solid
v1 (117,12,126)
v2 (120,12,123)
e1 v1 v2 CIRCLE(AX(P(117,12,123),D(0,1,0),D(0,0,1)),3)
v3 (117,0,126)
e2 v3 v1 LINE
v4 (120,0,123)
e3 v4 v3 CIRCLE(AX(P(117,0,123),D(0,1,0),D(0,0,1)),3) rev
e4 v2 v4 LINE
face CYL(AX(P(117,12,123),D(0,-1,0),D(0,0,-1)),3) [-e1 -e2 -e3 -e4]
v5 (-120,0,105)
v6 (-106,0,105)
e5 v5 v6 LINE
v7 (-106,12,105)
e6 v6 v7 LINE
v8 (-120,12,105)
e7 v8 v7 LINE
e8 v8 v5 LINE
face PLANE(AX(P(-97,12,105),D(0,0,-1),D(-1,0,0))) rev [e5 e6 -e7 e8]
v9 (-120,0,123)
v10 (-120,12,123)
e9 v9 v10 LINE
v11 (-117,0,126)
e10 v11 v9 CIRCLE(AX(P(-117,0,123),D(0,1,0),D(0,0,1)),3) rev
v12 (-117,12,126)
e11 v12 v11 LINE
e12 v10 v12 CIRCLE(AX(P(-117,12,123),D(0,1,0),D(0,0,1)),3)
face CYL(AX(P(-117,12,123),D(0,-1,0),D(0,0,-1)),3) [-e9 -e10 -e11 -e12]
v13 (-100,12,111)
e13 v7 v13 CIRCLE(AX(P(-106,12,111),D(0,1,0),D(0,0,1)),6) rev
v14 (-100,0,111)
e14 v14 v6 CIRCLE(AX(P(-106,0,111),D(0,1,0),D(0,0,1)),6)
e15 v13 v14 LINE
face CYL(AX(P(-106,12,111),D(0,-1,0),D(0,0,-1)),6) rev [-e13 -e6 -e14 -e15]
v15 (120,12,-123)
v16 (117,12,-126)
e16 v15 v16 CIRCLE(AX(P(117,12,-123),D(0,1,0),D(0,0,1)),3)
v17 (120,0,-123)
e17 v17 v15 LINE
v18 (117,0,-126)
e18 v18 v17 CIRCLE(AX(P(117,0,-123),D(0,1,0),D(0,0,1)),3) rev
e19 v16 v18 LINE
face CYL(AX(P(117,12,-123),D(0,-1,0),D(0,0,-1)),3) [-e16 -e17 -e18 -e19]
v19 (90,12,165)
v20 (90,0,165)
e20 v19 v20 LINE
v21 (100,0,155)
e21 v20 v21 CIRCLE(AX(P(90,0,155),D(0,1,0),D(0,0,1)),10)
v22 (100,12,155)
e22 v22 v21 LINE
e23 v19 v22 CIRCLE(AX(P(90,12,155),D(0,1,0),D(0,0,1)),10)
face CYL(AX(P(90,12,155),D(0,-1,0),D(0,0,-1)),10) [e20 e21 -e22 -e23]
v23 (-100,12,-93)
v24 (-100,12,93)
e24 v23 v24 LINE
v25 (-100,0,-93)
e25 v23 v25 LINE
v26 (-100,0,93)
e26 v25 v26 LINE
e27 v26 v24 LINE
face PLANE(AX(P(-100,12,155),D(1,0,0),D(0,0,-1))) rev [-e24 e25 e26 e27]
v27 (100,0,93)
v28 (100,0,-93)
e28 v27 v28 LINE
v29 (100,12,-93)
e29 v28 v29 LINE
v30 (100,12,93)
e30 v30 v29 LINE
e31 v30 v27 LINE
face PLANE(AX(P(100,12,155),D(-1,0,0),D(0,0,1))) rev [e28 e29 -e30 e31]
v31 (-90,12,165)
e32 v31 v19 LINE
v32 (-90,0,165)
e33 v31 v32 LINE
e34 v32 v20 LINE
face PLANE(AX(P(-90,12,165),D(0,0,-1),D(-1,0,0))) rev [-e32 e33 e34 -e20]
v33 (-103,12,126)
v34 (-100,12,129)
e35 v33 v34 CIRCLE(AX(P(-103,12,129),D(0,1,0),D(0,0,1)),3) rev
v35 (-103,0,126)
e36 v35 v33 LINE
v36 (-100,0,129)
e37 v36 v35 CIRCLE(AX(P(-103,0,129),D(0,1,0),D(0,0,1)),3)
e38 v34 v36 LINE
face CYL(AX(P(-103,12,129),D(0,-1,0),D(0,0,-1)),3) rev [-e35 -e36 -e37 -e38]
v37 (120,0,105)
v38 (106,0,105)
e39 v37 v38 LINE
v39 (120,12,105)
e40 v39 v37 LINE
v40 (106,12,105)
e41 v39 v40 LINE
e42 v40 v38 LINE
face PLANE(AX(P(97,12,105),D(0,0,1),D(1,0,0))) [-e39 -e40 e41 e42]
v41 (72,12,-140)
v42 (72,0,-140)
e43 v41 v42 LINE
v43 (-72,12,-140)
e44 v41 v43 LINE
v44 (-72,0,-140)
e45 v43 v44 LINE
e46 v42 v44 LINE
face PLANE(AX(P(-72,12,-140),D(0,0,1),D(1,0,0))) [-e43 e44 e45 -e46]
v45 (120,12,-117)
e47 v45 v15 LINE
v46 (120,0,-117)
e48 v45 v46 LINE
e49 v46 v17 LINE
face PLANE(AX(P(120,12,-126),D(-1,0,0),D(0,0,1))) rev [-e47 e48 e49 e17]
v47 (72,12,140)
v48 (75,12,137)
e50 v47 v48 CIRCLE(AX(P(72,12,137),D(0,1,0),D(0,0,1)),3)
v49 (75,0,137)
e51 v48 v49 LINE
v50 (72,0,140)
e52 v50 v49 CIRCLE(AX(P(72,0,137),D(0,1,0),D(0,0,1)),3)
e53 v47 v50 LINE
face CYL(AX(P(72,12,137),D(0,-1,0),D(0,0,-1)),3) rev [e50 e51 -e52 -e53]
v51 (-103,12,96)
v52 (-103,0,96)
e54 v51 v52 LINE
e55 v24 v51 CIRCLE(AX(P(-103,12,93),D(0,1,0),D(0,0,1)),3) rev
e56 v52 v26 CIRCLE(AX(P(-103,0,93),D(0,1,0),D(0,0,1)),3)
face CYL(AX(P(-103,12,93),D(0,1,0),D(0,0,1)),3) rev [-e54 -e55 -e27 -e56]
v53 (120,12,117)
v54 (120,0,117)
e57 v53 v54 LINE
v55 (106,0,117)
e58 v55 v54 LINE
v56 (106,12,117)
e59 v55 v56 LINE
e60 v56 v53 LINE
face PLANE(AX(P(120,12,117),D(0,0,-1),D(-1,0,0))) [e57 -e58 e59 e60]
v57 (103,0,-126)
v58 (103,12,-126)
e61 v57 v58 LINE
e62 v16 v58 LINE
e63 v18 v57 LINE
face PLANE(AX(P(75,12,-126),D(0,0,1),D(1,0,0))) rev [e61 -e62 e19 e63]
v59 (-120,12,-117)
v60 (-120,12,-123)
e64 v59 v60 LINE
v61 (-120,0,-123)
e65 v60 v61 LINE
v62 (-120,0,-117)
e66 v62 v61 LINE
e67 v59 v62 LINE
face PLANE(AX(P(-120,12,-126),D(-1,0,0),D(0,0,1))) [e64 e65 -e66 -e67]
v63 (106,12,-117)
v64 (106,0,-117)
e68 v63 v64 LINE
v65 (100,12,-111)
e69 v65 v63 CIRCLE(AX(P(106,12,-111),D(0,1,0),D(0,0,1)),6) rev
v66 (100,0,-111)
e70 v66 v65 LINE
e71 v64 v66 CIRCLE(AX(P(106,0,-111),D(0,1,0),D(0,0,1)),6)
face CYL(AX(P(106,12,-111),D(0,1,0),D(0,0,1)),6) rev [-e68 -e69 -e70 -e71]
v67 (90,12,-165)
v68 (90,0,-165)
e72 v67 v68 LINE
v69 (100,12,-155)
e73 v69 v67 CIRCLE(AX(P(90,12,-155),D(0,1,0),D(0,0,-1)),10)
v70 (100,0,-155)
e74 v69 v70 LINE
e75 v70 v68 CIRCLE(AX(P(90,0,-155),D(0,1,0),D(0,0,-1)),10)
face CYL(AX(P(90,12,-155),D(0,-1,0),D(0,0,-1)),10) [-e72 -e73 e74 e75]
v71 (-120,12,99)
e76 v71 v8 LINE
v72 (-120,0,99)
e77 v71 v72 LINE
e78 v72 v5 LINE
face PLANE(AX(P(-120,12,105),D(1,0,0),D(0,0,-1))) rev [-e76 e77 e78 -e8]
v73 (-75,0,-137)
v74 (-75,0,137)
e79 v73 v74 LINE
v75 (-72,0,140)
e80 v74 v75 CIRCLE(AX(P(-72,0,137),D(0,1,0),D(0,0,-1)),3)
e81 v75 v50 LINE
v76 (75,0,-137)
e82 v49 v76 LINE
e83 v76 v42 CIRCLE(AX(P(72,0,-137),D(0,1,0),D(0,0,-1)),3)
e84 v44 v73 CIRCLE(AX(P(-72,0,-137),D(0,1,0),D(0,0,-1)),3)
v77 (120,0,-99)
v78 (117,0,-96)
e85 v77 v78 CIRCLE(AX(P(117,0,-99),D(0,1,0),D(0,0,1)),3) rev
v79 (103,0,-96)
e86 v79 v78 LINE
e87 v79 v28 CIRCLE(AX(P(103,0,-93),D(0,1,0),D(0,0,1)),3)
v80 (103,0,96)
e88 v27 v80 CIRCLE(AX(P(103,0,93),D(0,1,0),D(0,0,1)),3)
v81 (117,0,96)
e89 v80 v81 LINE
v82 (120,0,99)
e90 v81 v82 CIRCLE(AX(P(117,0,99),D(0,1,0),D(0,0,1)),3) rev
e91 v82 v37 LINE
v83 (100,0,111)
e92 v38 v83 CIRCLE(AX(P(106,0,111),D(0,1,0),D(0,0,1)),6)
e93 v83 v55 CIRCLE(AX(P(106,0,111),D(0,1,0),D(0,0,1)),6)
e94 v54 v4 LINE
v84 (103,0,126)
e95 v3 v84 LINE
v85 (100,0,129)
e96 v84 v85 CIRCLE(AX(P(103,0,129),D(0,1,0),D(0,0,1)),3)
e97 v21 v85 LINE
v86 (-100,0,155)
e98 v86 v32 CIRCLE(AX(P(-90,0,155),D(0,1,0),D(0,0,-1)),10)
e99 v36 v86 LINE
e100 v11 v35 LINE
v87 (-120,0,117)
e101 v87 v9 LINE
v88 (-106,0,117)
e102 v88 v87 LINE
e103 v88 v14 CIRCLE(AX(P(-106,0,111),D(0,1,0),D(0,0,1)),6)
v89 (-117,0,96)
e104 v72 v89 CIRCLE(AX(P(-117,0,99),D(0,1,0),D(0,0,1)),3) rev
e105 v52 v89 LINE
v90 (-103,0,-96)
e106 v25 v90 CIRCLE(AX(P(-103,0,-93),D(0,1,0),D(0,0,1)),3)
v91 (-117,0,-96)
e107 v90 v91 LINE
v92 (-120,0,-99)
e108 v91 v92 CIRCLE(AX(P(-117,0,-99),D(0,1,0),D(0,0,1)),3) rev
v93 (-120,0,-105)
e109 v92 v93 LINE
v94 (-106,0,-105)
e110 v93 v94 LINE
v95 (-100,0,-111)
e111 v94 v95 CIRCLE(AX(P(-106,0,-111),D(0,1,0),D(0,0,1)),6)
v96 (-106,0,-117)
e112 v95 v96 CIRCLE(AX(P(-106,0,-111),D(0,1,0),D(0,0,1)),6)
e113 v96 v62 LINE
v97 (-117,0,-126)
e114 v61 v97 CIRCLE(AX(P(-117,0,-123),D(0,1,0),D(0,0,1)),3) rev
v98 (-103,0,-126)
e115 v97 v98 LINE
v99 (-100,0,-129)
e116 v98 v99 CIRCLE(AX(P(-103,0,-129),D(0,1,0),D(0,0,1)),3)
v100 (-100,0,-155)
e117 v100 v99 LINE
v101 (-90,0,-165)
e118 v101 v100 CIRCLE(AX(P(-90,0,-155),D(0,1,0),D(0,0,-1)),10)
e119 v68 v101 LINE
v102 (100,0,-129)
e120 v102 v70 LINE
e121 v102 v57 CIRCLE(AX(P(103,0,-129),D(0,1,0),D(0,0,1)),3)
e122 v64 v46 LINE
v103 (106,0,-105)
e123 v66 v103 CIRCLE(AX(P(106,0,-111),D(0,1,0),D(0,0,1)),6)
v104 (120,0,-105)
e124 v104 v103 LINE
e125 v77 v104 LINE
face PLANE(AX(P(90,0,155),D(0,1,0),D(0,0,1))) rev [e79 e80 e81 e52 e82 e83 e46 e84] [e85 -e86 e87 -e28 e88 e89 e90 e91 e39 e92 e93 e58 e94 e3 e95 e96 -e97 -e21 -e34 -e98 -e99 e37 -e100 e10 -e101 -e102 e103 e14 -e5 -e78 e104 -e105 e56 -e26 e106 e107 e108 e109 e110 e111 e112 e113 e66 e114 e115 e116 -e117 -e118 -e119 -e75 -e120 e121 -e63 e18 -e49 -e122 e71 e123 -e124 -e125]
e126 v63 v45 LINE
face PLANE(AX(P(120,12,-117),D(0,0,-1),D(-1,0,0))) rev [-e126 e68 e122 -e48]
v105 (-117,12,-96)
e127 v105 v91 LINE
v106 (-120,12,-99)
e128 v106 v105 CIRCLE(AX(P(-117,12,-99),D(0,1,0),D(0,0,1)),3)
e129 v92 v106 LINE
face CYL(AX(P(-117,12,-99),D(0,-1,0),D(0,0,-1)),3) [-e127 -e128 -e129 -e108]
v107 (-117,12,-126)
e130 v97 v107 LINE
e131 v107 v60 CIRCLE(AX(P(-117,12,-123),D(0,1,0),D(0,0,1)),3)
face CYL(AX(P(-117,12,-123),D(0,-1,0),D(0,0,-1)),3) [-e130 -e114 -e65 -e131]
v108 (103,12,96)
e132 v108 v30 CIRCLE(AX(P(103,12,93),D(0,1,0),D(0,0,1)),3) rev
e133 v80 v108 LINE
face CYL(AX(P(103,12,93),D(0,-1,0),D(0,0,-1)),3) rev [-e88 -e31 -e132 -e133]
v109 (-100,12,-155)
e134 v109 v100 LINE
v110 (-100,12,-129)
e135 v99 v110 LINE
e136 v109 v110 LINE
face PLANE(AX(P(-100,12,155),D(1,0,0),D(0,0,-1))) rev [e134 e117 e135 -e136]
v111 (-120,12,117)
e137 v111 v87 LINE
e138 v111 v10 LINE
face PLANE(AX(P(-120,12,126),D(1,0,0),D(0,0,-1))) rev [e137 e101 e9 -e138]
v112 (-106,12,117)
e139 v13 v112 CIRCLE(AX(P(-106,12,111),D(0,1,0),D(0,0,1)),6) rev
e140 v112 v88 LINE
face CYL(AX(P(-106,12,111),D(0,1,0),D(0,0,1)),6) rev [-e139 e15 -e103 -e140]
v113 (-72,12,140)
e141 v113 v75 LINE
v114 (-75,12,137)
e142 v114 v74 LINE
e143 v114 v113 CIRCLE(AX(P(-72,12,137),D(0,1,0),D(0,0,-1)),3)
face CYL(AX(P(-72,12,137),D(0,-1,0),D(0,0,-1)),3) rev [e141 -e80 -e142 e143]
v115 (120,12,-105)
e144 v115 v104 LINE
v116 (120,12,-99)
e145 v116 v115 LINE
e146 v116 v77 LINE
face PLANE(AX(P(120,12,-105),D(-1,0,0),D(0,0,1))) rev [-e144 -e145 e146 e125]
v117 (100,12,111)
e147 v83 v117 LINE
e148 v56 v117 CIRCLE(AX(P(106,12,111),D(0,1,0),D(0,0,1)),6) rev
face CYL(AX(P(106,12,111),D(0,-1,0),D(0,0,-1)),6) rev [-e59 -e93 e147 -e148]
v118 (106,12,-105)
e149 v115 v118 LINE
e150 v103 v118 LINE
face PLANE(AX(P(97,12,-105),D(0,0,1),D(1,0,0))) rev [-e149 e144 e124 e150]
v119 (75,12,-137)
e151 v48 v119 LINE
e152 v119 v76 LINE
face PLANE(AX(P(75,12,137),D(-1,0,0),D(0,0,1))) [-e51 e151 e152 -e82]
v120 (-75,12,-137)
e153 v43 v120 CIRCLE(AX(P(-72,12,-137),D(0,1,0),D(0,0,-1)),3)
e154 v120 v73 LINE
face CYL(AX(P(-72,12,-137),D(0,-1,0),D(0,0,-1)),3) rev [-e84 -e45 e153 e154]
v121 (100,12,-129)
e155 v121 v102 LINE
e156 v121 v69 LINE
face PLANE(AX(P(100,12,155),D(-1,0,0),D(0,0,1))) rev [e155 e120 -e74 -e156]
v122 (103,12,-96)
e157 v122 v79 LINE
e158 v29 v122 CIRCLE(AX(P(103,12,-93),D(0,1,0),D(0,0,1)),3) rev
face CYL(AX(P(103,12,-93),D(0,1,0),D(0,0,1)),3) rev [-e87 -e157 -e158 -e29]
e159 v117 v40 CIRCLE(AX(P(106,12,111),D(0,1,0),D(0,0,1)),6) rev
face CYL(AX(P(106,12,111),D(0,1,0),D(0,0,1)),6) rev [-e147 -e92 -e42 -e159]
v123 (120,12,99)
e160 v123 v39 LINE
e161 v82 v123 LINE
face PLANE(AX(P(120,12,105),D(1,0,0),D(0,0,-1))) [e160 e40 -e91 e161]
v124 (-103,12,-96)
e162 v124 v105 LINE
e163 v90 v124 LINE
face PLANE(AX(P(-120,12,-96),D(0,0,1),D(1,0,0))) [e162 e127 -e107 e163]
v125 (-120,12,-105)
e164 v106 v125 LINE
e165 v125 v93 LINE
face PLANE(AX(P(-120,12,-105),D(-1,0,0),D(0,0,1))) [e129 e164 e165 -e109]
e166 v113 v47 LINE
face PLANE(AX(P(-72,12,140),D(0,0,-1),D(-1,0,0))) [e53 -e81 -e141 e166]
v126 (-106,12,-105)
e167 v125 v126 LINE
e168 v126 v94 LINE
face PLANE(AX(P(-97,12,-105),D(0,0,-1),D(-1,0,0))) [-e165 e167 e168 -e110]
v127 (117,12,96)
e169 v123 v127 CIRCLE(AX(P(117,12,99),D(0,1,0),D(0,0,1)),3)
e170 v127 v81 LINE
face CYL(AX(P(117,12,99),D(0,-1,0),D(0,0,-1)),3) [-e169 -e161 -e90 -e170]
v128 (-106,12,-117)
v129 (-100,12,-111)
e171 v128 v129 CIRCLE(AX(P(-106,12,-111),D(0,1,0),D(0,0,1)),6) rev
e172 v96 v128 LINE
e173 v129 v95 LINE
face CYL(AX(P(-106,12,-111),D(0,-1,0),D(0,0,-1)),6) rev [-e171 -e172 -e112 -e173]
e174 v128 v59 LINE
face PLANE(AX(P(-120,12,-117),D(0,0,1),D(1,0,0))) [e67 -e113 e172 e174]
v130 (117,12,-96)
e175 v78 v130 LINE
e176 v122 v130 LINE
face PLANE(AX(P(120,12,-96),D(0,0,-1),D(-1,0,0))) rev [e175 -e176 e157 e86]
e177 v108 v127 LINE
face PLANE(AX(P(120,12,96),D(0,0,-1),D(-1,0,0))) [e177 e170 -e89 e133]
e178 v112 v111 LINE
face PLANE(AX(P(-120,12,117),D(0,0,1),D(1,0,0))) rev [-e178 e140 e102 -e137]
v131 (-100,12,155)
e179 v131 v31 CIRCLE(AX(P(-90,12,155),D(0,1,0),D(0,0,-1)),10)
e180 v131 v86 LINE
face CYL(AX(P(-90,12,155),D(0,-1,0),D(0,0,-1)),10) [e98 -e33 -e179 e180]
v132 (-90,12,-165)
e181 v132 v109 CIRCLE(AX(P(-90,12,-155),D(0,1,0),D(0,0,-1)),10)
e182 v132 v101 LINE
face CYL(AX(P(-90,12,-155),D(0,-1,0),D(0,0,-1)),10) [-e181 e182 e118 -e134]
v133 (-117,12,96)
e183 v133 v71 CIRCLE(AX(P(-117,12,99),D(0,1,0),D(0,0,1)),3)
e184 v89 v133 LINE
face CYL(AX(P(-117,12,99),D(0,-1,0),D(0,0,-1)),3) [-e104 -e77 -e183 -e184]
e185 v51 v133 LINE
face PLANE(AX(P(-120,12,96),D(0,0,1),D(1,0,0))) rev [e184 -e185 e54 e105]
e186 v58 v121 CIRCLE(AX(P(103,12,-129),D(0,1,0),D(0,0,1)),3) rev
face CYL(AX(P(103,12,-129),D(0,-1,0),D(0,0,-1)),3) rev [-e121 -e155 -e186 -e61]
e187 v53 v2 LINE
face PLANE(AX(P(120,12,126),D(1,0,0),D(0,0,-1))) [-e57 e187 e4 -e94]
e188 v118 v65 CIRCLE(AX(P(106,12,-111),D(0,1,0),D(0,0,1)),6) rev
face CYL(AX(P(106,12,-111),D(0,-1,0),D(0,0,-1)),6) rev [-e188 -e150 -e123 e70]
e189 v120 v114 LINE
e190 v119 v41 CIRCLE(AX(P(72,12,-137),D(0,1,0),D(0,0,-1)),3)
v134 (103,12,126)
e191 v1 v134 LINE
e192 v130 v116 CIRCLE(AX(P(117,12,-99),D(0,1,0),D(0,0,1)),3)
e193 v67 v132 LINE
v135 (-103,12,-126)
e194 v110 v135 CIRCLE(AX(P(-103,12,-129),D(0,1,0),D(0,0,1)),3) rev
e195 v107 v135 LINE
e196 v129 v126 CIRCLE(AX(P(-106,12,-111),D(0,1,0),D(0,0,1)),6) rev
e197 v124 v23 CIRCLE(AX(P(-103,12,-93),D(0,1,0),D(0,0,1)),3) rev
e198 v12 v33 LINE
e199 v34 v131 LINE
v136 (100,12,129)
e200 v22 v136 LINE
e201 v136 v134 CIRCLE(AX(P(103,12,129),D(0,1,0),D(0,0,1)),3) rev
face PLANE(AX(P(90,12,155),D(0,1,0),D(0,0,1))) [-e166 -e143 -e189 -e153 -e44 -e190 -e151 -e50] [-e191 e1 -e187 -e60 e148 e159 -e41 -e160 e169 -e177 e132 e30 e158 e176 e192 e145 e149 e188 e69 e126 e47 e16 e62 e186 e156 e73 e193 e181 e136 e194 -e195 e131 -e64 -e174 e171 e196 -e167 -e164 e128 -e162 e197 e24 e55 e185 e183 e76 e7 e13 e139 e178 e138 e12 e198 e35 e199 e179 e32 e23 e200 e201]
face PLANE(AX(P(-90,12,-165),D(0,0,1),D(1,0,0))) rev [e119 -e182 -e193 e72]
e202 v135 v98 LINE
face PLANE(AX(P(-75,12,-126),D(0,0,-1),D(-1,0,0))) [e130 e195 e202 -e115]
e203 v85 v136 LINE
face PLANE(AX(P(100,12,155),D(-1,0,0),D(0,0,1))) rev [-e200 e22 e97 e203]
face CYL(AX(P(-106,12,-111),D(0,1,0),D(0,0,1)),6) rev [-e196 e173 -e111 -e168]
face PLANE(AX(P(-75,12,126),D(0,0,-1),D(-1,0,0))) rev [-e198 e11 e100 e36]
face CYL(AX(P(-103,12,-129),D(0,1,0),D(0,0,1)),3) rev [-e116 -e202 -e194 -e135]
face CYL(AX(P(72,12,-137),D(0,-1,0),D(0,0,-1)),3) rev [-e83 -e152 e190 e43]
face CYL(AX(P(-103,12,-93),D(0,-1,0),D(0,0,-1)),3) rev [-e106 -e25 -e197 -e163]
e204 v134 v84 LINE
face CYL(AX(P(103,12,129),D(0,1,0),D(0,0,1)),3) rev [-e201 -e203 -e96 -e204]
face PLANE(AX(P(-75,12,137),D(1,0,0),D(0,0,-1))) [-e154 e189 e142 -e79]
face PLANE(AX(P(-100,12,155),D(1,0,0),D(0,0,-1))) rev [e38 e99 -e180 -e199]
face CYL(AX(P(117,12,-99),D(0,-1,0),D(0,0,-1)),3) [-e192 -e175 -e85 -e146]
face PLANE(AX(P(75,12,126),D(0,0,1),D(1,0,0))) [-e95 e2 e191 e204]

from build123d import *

# Parameters (mm, degrees)
BOSS_EXTRUDE1_DEPTH  = 12
BOSS_EXTRUDE2_DEPTH  = 12
MIRROR4_COPY_1_DEPTH = 12
FILLET3_R            = 6
FILLET4_R            = 3


with BuildPart() as part:
    # Sketch2 → Boss-Extrude1 (new body)
    with BuildSketch(Plane(origin=(0, 0, 0), x_dir=(1, 0, 0), z_dir=(0, 1, 0))):
        with BuildLine():
            Line((-90, -165), (90, -165))
            ThreePointArc((90, -165), (97.071067812, -162.071067812), (100, -155))
            Line((100, -155), (100, 155))
            ThreePointArc((100, 155), (97.071067812, 162.071067812), (90, 165))
            Line((90, 165), (-90, 165))
            ThreePointArc((-90, 165), (-97.071067812, 162.071067812), (-100, 155))
            Line((-100, 155), (-100, -155))
            ThreePointArc((-100, -155), (-97.071067812, -162.071067812), (-90, -165))
        make_face()
        with BuildLine():
            Line((-72, -140), (72, -140))
            ThreePointArc((72, -140), (74.121320344, -139.121320344), (75, -137))
            Line((75, -137), (75, 137))
            ThreePointArc((75, 137), (74.121320344, 139.121320344), (72, 140))
            Line((72, 140), (-72, 140))
            ThreePointArc((-72, 140), (-74.121320344, 139.121320344), (-75, 137))
            Line((-75, 137), (-75, -137))
            ThreePointArc((-75, -137), (-74.121320344, -139.121320344), (-72, -140))
        make_face(mode=Mode.SUBTRACT)
    extrude(amount=BOSS_EXTRUDE1_DEPTH)

    # Sketch3 → Boss-Extrude2 (add)
    with BuildSketch(Plane(origin=(0, 0, 0), x_dir=(1, 0, 0), z_dir=(0, 1, 0))):
        Polygon((75, 126), (120, 126), (120, 117), (97, 117), (97, 105), (120, 105), (120, 96), (75, 96), align=None)
    boss_extrude2 = extrude(amount=BOSS_EXTRUDE2_DEPTH)

    # Mirror3: Boss-Extrude2 across plane
    add(boss_extrude2.mirror(Plane(origin=(0, 0, 0), x_dir=(0, 0, 1), z_dir=(1, 0, 0))))

    # Mirror4: Boss-Extrude2 across plane
    add(boss_extrude2.mirror(Plane.XY))

    # Mirror4 copy 1 sketch → Mirror4 copy 1 (add)
    with BuildSketch(Plane(origin=(0, 0, 0), x_dir=(-1, 0, 0), z_dir=(0, 1, 0))):
        Polygon((75, 126), (120, 126), (120, 117), (97, 117), (97, 105), (120, 105), (120, 96), (75, 96), align=None)
    extrude(amount=MIRROR4_COPY_1_DEPTH)

    # Fillet3
    fillet3_edges = [part.edges().sort_by_distance(p)[0] for p in [
        (-100, 6, 117),
        (-100, 6, 105),
        (100, 6, 117),
        (100, 6, 105),
        (100, 6, -105),
        (100, 6, -117),
        (-100, 6, -105),
        (-100, 6, -117),
    ]]
    fillet(fillet3_edges, radius=FILLET3_R - 0.0001)  # a hair under: the kernel refuses the full size

    # Fillet4
    fillet4_edges = [part.edges().sort_by_distance(p)[0] for p in [
        (-120, 6, -96),
        (-120, 6, -126),
        (-100, 6, -96),
        (-100, 6, -126),
        (120, 6, 96),
        (120, 6, 126),
        (100, 6, 96),
        (100, 6, 126),
        (-100, 6, 126),
        (-120, 6, 126),
        (-100, 6, 96),
        (-120, 6, 96),
        (100, 6, -126),
        (120, 6, -126),
        (100, 6, -96),
        (120, 6, -96),
    ]]
    fillet(fillet4_edges, radius=FILLET4_R)


solid = part.part
